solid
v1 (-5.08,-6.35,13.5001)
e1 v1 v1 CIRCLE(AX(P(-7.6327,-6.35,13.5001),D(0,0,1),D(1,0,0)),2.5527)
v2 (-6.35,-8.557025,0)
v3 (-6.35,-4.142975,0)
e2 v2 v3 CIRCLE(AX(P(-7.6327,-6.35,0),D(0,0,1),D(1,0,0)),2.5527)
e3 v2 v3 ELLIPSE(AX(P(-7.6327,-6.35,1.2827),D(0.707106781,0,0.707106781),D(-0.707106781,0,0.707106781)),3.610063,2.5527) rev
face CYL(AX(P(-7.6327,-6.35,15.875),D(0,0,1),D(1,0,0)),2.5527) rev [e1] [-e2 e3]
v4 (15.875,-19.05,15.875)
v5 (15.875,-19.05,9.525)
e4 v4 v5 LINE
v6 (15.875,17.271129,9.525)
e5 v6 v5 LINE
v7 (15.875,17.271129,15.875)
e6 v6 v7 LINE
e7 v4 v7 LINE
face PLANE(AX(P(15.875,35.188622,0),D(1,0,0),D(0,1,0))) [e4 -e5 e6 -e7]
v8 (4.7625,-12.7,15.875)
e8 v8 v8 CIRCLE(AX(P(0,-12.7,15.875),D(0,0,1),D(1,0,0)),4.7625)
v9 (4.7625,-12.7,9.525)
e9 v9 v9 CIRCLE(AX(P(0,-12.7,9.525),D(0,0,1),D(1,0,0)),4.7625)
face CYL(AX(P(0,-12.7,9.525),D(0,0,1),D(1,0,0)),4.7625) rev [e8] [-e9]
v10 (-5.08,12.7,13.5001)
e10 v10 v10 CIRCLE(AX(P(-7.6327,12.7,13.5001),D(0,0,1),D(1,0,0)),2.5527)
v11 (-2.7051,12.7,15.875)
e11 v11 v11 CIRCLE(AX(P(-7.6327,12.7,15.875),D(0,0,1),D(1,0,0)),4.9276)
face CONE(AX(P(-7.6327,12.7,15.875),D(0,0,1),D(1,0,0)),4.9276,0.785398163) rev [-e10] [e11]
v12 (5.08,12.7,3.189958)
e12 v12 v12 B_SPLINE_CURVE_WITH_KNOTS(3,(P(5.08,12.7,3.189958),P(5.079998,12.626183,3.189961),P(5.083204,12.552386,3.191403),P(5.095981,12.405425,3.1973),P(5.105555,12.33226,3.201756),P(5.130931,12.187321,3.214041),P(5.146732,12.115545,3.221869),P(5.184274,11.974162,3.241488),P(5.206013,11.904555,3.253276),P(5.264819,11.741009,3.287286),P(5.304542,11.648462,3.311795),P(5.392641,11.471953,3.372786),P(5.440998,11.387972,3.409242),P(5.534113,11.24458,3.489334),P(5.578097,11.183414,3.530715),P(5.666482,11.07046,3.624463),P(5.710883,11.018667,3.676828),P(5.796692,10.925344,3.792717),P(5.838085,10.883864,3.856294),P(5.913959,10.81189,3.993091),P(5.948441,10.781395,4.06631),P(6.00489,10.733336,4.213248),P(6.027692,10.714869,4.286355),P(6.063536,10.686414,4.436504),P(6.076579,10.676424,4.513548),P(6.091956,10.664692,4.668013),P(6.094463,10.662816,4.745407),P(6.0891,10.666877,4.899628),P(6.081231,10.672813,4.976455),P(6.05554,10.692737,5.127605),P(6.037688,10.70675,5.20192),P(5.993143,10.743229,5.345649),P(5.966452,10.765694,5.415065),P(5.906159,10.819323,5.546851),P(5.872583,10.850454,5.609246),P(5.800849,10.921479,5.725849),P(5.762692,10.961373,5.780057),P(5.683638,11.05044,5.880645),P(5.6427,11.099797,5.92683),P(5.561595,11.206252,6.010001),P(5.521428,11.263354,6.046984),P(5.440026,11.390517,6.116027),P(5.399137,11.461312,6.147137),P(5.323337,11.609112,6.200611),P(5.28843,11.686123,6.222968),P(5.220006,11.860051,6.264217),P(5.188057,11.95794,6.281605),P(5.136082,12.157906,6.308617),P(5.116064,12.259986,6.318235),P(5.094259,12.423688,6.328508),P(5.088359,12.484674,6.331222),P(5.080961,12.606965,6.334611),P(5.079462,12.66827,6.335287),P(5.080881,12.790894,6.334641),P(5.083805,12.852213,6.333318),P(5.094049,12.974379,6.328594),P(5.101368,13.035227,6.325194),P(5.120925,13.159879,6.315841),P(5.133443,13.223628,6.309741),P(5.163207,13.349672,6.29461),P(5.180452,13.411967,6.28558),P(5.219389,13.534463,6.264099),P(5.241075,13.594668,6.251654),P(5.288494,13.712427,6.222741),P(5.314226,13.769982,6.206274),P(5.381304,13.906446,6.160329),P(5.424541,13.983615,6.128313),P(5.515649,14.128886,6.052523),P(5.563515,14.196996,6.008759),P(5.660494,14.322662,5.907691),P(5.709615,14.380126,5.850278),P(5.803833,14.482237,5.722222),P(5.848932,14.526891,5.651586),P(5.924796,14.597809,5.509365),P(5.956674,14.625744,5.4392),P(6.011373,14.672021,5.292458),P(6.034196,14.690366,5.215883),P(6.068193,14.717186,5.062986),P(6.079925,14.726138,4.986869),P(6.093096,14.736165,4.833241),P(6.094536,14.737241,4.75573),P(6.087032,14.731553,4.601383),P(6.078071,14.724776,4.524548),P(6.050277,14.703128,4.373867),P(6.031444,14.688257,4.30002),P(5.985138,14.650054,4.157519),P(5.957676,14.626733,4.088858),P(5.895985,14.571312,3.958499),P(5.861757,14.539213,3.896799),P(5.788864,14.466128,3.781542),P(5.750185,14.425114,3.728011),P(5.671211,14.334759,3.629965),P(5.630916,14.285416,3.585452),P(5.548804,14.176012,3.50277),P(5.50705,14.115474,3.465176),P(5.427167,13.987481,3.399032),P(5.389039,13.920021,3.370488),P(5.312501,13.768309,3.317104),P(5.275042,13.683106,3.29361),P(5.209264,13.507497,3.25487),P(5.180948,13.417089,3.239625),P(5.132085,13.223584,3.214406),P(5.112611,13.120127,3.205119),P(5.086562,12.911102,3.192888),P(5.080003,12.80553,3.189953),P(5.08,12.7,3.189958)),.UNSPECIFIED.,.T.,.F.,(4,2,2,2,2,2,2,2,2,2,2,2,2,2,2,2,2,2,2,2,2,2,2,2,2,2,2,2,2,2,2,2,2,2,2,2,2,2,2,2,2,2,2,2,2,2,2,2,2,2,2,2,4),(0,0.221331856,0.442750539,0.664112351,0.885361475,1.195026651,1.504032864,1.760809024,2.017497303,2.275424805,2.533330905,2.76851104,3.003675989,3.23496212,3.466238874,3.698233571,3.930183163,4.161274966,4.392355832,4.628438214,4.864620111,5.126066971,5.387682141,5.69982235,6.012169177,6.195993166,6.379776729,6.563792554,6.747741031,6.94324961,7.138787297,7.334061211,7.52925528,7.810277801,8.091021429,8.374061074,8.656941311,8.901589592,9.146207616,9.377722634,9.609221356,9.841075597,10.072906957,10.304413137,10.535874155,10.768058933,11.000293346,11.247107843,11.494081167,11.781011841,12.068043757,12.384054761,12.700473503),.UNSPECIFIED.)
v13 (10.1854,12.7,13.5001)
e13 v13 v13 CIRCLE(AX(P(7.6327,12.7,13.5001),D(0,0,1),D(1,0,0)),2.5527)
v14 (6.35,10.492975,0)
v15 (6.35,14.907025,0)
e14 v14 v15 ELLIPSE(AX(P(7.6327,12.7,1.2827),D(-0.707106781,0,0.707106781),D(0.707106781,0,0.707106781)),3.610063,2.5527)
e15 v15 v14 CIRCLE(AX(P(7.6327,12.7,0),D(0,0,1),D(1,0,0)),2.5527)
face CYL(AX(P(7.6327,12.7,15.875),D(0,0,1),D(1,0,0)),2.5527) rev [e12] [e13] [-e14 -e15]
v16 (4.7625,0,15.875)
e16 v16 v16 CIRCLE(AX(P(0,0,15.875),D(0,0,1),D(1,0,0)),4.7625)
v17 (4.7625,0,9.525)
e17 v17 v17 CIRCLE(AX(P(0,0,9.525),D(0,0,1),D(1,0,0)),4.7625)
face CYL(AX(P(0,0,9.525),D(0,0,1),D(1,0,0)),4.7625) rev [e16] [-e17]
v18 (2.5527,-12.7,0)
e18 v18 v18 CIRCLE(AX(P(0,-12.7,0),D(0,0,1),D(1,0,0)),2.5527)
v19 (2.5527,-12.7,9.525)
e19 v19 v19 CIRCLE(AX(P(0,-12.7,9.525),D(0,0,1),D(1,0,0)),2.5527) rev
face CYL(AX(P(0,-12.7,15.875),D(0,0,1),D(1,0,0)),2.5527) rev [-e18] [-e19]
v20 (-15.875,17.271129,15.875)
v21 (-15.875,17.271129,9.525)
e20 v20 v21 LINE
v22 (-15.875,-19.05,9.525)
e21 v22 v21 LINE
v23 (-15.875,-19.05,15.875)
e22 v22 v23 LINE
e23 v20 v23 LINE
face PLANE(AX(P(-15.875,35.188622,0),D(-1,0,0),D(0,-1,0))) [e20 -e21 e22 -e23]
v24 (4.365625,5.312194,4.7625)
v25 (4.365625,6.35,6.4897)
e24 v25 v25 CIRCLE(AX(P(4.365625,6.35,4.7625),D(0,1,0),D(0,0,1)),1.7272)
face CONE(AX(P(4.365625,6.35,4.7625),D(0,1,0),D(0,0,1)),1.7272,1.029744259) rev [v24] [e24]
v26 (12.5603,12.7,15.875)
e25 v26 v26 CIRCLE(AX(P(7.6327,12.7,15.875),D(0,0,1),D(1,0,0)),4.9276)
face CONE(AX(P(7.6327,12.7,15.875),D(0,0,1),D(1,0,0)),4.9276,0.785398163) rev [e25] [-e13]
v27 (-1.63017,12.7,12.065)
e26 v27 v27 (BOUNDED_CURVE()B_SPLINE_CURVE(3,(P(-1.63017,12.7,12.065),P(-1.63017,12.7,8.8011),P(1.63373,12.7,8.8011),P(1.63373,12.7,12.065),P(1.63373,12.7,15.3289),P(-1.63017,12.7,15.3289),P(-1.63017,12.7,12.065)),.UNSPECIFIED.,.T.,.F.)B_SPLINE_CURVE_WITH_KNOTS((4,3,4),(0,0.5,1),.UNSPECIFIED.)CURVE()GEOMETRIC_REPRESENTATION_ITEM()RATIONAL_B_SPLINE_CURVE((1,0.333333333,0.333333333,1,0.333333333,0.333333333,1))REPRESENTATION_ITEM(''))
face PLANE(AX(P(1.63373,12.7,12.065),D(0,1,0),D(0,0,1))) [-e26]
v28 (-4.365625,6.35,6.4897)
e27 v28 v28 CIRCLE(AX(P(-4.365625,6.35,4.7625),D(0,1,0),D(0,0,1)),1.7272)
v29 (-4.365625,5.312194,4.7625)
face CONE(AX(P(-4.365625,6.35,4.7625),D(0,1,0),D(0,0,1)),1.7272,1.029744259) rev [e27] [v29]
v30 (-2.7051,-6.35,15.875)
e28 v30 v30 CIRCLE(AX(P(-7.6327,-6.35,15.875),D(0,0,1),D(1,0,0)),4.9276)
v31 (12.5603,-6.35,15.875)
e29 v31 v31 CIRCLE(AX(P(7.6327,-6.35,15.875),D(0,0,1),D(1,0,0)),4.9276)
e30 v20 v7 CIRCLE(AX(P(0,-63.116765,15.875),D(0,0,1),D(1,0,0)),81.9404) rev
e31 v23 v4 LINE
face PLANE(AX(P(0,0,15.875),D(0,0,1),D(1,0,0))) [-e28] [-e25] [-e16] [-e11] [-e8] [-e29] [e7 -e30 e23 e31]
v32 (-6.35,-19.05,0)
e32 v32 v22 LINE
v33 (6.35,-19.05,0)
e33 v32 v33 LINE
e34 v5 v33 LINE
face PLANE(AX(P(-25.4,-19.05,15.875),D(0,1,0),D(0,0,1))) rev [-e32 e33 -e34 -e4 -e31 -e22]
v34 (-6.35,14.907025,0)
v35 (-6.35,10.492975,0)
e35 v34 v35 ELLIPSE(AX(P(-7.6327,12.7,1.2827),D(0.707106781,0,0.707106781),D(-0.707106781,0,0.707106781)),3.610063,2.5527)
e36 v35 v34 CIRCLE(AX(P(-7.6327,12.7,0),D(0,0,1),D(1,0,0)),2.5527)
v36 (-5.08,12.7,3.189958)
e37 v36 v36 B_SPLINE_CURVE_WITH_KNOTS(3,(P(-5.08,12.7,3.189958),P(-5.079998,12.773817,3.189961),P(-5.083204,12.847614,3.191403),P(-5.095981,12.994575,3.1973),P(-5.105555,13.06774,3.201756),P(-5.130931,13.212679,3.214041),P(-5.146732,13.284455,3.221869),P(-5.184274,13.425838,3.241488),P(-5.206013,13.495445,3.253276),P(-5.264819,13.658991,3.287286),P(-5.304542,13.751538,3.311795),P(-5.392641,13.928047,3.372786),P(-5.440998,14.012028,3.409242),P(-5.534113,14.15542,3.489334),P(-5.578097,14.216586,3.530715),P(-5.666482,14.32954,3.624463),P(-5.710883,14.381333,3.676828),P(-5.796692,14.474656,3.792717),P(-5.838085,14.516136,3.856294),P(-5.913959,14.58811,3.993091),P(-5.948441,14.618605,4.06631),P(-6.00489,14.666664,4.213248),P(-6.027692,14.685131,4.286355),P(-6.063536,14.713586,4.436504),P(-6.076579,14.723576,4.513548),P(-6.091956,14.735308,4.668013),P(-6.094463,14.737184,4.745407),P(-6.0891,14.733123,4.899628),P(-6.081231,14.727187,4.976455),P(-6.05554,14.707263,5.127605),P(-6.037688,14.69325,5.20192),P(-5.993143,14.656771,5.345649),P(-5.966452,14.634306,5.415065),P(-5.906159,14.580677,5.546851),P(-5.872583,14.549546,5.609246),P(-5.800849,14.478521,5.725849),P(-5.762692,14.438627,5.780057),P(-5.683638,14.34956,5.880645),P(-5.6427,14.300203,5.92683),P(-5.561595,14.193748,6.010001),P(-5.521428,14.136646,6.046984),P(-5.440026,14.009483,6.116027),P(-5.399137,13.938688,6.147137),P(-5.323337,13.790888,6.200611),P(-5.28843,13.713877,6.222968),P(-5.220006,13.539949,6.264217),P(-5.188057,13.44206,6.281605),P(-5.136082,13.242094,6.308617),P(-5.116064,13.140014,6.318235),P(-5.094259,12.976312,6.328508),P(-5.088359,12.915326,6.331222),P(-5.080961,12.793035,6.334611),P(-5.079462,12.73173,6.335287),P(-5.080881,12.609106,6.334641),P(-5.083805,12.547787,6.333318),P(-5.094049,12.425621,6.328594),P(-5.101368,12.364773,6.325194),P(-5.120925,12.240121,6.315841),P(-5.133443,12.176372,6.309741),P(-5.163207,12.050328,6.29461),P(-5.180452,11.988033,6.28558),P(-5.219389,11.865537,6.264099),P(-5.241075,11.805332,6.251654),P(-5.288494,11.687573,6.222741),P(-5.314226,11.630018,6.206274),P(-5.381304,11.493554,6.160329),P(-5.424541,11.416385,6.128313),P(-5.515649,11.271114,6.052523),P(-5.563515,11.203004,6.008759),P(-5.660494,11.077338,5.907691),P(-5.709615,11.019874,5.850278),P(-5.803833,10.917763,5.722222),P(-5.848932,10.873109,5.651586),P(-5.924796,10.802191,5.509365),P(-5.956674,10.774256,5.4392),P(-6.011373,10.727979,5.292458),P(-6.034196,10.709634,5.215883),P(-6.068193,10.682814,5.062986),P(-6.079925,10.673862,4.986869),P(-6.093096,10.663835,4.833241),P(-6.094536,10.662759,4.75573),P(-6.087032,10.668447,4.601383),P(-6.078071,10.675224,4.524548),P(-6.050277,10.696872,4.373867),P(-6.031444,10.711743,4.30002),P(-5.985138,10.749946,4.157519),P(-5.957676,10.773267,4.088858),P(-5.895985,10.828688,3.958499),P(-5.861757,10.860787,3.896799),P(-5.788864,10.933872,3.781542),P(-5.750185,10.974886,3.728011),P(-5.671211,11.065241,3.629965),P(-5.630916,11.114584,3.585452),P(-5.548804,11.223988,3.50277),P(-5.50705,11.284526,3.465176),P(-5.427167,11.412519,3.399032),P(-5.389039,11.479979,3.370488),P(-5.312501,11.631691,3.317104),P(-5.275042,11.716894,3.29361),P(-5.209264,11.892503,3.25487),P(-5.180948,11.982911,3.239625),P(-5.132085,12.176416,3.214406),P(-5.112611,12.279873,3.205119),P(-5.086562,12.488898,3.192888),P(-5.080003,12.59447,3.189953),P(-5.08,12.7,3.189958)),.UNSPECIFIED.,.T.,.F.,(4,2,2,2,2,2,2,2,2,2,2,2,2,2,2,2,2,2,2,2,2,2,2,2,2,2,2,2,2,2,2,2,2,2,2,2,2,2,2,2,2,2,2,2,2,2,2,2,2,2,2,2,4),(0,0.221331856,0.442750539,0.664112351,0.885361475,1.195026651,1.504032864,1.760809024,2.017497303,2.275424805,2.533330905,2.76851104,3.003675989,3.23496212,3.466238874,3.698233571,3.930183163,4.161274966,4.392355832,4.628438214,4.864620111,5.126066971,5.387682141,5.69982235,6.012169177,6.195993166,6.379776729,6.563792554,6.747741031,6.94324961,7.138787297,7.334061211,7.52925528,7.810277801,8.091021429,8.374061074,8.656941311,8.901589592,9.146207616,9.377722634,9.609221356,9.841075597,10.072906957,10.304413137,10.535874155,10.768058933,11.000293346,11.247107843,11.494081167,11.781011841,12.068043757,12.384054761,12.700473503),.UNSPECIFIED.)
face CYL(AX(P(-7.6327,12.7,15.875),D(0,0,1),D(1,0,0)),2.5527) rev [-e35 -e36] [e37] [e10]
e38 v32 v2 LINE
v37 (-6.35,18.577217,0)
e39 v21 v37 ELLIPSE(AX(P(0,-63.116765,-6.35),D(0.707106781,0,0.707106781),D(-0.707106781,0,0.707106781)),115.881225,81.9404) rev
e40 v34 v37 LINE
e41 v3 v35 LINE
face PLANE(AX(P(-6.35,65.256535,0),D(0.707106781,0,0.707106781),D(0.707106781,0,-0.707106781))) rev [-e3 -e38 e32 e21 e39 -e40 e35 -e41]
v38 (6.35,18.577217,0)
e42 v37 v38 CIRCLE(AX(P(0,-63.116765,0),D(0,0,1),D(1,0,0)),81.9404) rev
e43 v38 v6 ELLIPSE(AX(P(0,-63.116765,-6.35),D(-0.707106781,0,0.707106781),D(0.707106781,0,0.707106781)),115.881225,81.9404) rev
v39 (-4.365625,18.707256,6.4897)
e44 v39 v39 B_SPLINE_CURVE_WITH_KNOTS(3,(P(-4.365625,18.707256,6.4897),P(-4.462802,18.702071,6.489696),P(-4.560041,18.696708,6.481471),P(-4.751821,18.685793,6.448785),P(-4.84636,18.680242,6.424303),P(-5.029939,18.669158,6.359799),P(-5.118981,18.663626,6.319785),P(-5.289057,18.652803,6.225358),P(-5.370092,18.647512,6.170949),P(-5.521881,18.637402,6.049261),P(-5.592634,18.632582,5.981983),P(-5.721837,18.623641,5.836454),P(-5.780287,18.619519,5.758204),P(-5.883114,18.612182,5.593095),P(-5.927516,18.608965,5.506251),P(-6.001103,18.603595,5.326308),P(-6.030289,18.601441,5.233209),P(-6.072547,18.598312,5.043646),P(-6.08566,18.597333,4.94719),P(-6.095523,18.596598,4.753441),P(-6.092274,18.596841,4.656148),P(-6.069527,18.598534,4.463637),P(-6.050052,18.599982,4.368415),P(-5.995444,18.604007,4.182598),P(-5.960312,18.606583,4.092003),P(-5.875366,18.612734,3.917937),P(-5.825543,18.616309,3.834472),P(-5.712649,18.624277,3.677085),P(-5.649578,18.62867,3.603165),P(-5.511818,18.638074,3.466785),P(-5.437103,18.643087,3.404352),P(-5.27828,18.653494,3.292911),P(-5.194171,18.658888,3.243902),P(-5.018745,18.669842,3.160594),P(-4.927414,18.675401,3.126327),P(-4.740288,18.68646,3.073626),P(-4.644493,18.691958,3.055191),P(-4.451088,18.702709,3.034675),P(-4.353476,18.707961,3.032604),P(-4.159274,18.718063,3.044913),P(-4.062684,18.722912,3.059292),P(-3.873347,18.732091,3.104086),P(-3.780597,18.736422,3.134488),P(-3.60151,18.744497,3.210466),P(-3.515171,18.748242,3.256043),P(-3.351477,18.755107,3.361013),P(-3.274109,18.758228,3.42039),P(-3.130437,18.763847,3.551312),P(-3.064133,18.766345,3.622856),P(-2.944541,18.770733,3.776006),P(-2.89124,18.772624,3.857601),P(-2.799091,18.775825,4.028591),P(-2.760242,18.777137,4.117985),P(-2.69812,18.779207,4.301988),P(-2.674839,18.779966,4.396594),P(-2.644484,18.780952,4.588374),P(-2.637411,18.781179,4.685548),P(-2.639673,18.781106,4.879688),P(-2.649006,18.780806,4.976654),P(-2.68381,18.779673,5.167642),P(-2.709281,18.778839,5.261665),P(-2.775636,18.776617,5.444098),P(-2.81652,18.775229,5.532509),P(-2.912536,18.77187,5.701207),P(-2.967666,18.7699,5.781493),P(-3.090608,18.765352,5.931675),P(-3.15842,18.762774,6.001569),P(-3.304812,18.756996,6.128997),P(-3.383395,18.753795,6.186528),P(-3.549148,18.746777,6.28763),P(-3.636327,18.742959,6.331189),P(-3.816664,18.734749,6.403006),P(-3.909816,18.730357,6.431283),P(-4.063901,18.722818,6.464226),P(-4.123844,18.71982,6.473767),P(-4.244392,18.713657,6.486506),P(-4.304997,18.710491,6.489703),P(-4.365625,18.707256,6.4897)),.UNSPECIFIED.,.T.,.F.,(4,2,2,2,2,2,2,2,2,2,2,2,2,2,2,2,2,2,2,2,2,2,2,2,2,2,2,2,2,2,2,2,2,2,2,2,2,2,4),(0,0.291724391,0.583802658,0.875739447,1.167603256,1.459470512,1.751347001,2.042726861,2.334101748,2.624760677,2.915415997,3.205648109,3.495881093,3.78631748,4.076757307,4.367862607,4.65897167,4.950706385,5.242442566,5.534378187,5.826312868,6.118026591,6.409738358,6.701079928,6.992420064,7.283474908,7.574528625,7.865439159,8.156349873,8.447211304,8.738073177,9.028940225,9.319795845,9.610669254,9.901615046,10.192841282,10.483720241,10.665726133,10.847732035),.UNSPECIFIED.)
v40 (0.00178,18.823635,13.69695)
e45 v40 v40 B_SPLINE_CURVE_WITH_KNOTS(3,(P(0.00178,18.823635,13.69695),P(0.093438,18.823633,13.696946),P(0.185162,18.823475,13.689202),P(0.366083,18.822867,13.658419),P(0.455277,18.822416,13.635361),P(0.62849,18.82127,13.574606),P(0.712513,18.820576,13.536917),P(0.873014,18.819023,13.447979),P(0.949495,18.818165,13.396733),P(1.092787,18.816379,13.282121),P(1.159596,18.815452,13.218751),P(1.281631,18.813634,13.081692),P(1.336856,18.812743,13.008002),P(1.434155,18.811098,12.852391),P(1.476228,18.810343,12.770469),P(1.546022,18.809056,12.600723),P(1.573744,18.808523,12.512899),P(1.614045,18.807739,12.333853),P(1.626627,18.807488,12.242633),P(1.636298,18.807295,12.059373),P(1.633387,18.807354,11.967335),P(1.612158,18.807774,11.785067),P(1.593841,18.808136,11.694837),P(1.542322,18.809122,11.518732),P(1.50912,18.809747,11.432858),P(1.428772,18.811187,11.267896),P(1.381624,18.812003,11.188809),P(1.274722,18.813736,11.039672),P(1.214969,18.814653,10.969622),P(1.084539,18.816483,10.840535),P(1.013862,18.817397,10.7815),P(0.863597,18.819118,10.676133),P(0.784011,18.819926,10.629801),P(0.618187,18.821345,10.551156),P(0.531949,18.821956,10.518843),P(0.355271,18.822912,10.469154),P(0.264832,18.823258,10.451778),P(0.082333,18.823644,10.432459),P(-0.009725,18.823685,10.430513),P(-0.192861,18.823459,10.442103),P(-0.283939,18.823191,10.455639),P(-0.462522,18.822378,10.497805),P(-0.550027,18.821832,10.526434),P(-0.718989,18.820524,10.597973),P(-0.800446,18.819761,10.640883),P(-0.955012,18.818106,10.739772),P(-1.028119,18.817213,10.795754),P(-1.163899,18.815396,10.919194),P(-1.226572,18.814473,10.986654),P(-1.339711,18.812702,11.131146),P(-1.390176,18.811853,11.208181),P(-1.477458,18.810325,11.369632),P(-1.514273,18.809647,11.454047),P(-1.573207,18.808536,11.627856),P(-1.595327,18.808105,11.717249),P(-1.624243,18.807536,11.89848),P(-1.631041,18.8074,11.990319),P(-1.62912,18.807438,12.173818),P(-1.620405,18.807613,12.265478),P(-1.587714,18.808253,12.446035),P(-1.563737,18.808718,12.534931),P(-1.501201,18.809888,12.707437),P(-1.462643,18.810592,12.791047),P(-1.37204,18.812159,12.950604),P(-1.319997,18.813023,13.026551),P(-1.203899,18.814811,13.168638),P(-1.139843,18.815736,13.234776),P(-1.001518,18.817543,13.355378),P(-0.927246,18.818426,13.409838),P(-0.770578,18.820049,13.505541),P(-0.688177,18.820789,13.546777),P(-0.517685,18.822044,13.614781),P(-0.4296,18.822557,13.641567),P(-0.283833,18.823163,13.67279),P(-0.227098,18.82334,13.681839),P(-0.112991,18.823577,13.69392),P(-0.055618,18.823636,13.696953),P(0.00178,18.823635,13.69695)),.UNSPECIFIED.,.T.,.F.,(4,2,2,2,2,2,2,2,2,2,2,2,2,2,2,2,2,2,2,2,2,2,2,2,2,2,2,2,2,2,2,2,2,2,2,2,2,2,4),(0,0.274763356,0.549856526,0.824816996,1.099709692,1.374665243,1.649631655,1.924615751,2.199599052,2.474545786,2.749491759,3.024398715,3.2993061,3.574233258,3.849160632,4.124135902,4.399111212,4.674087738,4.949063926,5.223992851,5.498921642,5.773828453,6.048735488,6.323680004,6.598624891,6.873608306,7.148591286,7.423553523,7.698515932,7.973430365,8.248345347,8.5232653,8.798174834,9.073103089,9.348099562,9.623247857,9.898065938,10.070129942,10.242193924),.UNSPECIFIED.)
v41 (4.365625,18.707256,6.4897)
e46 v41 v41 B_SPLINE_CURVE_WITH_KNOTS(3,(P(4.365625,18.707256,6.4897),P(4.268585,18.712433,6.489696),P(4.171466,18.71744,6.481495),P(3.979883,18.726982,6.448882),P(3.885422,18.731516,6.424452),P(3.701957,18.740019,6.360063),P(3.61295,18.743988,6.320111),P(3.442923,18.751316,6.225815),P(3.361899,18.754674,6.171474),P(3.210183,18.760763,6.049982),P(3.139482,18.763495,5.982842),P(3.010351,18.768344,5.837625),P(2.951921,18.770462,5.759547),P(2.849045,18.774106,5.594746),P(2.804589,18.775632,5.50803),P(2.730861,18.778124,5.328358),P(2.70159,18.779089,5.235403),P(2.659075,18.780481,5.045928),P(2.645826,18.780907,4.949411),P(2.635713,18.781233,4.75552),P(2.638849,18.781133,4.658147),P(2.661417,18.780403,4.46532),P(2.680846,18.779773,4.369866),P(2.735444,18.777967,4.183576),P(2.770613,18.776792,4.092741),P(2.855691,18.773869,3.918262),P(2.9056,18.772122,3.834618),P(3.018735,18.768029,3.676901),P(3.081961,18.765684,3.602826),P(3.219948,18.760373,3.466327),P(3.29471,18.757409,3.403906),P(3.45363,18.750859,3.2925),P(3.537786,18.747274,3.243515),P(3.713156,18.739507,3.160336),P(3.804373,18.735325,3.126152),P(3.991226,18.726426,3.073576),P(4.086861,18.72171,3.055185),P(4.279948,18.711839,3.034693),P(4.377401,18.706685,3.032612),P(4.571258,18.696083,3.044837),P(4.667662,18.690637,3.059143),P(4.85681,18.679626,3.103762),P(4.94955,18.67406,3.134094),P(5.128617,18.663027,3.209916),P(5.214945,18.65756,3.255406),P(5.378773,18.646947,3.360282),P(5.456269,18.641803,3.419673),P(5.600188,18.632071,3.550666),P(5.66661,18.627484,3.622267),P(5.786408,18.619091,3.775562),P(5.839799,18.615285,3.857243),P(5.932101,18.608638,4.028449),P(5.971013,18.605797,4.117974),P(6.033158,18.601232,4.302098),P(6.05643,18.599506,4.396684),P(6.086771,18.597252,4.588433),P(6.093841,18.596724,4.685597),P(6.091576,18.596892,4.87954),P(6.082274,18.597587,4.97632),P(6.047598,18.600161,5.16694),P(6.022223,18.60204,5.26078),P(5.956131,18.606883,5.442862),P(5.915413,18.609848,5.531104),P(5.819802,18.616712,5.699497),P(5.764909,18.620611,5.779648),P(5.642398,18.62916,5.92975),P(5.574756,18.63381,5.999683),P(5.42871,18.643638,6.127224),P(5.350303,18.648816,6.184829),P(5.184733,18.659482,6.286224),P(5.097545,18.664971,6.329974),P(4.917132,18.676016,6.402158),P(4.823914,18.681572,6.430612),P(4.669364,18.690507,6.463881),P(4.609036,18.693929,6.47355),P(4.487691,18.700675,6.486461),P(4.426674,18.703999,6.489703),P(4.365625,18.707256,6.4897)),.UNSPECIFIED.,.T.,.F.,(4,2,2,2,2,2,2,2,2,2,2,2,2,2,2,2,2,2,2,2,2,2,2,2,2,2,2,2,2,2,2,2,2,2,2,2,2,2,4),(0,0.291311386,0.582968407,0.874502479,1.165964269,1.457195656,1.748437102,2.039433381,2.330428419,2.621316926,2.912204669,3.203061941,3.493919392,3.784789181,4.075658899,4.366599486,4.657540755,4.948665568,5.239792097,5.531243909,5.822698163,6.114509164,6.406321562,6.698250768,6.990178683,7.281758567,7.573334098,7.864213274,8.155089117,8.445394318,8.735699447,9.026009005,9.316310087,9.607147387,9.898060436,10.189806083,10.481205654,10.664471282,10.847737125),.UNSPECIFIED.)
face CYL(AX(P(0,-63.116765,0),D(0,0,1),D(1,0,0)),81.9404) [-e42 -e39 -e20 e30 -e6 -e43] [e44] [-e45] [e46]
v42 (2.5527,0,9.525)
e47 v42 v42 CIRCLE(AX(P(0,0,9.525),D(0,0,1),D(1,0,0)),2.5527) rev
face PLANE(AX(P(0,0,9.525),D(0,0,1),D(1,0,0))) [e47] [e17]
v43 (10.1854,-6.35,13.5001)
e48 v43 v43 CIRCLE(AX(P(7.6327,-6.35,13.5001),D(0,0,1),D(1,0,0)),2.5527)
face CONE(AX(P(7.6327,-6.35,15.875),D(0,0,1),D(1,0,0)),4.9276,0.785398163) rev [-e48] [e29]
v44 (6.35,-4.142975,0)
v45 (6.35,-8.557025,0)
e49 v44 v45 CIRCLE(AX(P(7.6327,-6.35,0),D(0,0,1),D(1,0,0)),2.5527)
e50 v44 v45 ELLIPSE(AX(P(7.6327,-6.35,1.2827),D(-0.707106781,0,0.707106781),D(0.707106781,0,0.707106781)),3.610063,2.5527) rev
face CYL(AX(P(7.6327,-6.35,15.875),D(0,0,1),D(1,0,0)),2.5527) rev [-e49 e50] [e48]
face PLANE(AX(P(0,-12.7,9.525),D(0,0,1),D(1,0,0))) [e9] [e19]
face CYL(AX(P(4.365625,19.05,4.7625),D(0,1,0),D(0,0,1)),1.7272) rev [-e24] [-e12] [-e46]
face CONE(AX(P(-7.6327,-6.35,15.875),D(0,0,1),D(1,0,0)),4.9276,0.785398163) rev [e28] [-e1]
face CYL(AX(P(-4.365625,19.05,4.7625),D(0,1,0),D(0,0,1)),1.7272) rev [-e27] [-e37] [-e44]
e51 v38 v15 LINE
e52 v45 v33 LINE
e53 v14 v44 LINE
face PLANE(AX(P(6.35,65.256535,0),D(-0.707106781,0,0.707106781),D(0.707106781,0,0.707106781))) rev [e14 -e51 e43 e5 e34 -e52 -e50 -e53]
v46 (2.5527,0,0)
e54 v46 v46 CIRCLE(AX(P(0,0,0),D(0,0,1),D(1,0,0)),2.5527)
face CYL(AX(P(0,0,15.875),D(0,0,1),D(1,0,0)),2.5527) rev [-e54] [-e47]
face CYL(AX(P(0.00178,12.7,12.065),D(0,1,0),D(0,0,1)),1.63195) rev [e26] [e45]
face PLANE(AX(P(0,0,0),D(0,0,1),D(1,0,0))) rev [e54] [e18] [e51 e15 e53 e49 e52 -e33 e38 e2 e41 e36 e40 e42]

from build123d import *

# Parameters (mm, degrees)
SKETCH1_W                    = 50.8
SKETCH1_H                    = 38.1
BOSS_EXTRUDE1_DEPTH          = 15.875
F_1_4_20_TAPPED_HOLE1_D      = 5.1054
CUT_EXTRUDE1_DEPTH           = 36.497579143
CUT_EXTRUDE1_DEPTH_BACK      = 36.497579143
SKETCH5_W                    = 73.284203365
SKETCH5_H                    = 114.763304797
CUT_EXTRUDE3_DEPTH           = 36.497579143
CUT_EXTRUDE3_DRAFT           = 45
CUT_EXTRUDE3_PROFILE_2_DEPTH = 36.497579143
CUT_EXTRUDE3_PROFILE_2_DRAFT = 45
CUT_EXTRUDE5_DEPTH           = 34.299680929
CUT_EXTRUDE5_DEPTH_BACK      = 34.299680929
SKETCH7_W                    = 138.535058429
SKETCH7_H                    = 124.054324336
SKETCH7_W_2                  = 31.75
SKETCH7_H_2                  = 70.377244636
F_1_4_20_TAPPED_HOLE2_D      = 5.1054
F_8_32_TAPPED_HOLE1_D        = 3.4544
F_8_32_TAPPED_HOLE1_DEPTH    = 12.7
F_8_32_TAPPED_HOLE1_TIP      = 1.037806461
CUT_EXTRUDE6_DEPTH           = 6.35
SKETCH14_R                   = 4.7625
CUT_EXTRUDE7_DEPTH           = 6.35


# Read off the part's stored shape, not the designer's step: LPattern1
with BuildPart() as part:
    # Sketch1 → Boss-Extrude1 (new body)
    with BuildSketch(Plane.XY):
        Rectangle(SKETCH1_W, SKETCH1_H)
    extrude(amount=BOSS_EXTRUDE1_DEPTH)

    # 1/4-20 Tapped Hole1 (through all)
    with Locations(Plane.XY.offset(15.875)):
        with Locations((7.6327, 12.7), (-7.6327, 12.7)):
            Hole(F_1_4_20_TAPPED_HOLE1_D / 2)

    # Sketch4 → Cut-Extrude1 (cut, two sides: drawn at the far end of the back side and taken through both)
    with BuildSketch(Plane.XY.offset(15.875).offset(-CUT_EXTRUDE1_DEPTH_BACK)):
        with BuildLine():
            Line((-39.282326984, 8.793789894), (-52.704404265, 33.364356416))
            Line((-52.704404265, 33.364356416), (0, 61.927684543))
            Line((0, 61.927684543), (62.667848215, 36.771765562))
            Line((62.667848215, 36.771765562), (48.5918884, 2.86093959))
            ThreePointArc((48.5918884, 2.86093959), (5.519661368, 18.637515941), (-39.282326984, 8.793789894))
        make_face()
    extrude(amount=CUT_EXTRUDE1_DEPTH + CUT_EXTRUDE1_DEPTH_BACK, mode=Mode.SUBTRACT)


with BuildPart() as cut_extrude3_tool:
    # Sketch5 → Cut-Extrude3 (with draft: the straight prism first)
    with BuildSketch(Plane.XY):
        with Locations((-42.992101682, 7.874882724)):
            Rectangle(SKETCH5_W, SKETCH5_H)
    extrude(amount=CUT_EXTRUDE3_DEPTH)
    # Cut-Extrude3: the draft: its side faces are tilted about the plane it starts from
    cut_extrude3_sides = [cut_extrude3_tool.faces().sort_by_distance(p)[0] for p in [
        (-42.992101682, 65.256535122, 18.248789571),
        (-79.634203365, 7.874882724, 18.248789571),
        (-42.992101682, -49.506769675, 18.248789571),
        (-6.35, 7.874882724, 18.248789571),
    ]]
    draft(cut_extrude3_sides, Plane.XY, CUT_EXTRUDE3_DRAFT)


with BuildPart() as part_1:
    add(part.part)

    # Cut-Extrude3: cut by cut_extrude3_tool
    add(cut_extrude3_tool.part, mode=Mode.SUBTRACT)


with BuildPart() as cut_extrude3_profile_2_tool:
    # Sketch5 → Cut-Extrude3 profile 2 (with draft: the straight prism first)
    with BuildSketch(Plane.XY):
        with Locations((42.992101682, 7.874882724)):
            Rectangle(SKETCH5_W, SKETCH5_H)
    extrude(amount=CUT_EXTRUDE3_PROFILE_2_DEPTH)
    # Cut-Extrude3 profile 2: the draft: its side faces are tilted about the plane it starts from
    cut_extrude3_profile_2_sides = [cut_extrude3_profile_2_tool.faces().sort_by_distance(p)[0] for p in [
        (42.992101682, 65.256535122, 18.248789571),
        (6.35, 7.874882724, 18.248789571),
        (42.992101682, -49.506769675, 18.248789571),
        (79.634203365, 7.874882724, 18.248789571),
    ]]
    draft(cut_extrude3_profile_2_sides, Plane.XY, CUT_EXTRUDE3_PROFILE_2_DRAFT)


with BuildPart() as part_2:
    add(part_1.part)

    # Cut-Extrude3 profile 2: cut by cut_extrude3_profile_2_tool
    add(cut_extrude3_profile_2_tool.part, mode=Mode.SUBTRACT)

    # Cut-Extrude4 cone 1 section (through the dimple's axis) → Cut-Extrude4 (revolve, cut)
    with BuildSketch(Plane(origin=(-7.6327, 12.7, 15.875), x_dir=(0, -1, 0), z_dir=(1, 0, 0))):
        Polygon((0, 0), (4.9276, 0), (0, 4.9276), align=None)
    revolve(axis=Axis((-7.6327, 12.7, 15.875), (0, 0, -1)), mode=Mode.SUBTRACT)

    # Cut-Extrude4 cone 2 section (through the dimple's axis) → Cut-Extrude4 cone 2 (revolve, cut)
    with BuildSketch(Plane(origin=(7.6327, 12.7, 15.875), x_dir=(0, -1, 0), z_dir=(1, 0, 0))):
        Polygon((0, 0), (4.9276, 0), (0, 4.9276), align=None)
    revolve(axis=Axis((7.6327, 12.7, 15.875), (0, 0, -1)), mode=Mode.SUBTRACT)

    # Sketch7 → Cut-Extrude5 (cut, two sides: drawn at the far end of the back side and taken through both)
    with BuildSketch(Plane.XY.offset(15.875).offset(-CUT_EXTRUDE5_DEPTH_BACK)):
        with Locations((-4.796027088, -12.18557991)):
            Rectangle(SKETCH7_W, SKETCH7_H)
        Rectangle(SKETCH7_W_2, SKETCH7_H_2, mode=Mode.SUBTRACT)
    extrude(amount=CUT_EXTRUDE5_DEPTH + CUT_EXTRUDE5_DEPTH_BACK, mode=Mode.SUBTRACT)

    # 1/4-20 Tapped Hole2 (through all)
    with Locations(Plane.XY.offset(15.875)):
        with Locations((0, -12.7), (0, 0)):
            Hole(F_1_4_20_TAPPED_HOLE2_D / 2)

    # #8-32 Tapped Hole1
    with Locations(Plane(origin=(0, 19.05, 0), x_dir=(-1, 0, 0), z_dir=(0, 1, 0))):
        with Locations((4.365625, 4.7625), (-4.365625, 4.7625)):
            Hole(F_8_32_TAPPED_HOLE1_D / 2, depth=F_8_32_TAPPED_HOLE1_DEPTH)
            with Locations((0, 0, -(F_8_32_TAPPED_HOLE1_DEPTH + F_8_32_TAPPED_HOLE1_TIP / 2))):  # 118° drill point
                Cone(0, F_8_32_TAPPED_HOLE1_D / 2, F_8_32_TAPPED_HOLE1_TIP, mode=Mode.SUBTRACT)

    # Sketch13 → Cut-Extrude6 (cut)
    with BuildSketch(Plane(origin=(0, 19.05, 0), x_dir=(-1, 0, 0), z_dir=(0, -1, 0))):
        with BuildLine():
            add(Edge.make_bspline(
                [(1.630169721, -12.065), (1.630169721, -8.8011), (-1.633730278, -8.8011), (-1.633730278, -12.065), (-1.633730278, -15.3289), (1.630169721, -15.3289), (1.630169721, -12.065)],
                knots=[0, 0, 0, 0, 0.5, 0.5, 0.5, 1, 1, 1, 1], degree=3, weights=[1, 0.333333333, 0.333333333, 1, 0.333333333, 0.333333333, 1]))
        make_face()
    extrude(amount=CUT_EXTRUDE6_DEPTH, mode=Mode.SUBTRACT)

    # LPattern1 outline → LPattern1 (revolve, cut)
    with BuildSketch(Plane(origin=(-7.6327, -6.35, 0), x_dir=(1, 0, 0), z_dir=(0, -1, 0))):
        Polygon((0, 0), (2.5527, 0), (2.5527, 13.5001), (4.9276, 15.875), (0, 15.875), align=None)
    revolve(axis=Axis((-7.6327, -6.35, 0), (0, 0, 1)), mode=Mode.SUBTRACT)

    # LPattern1 2 outline → LPattern1 2 (revolve, cut)
    with BuildSketch(Plane(origin=(7.6327, -6.35, 0), x_dir=(1, 0, 0), z_dir=(0, -1, 0))):
        Polygon((0, 0), (2.5527, 0), (2.5527, 13.5001), (4.9276, 15.875), (0, 15.875), align=None)
    revolve(axis=Axis((7.6327, -6.35, 0), (0, 0, 1)), mode=Mode.SUBTRACT)

    # Sketch14 → Cut-Extrude7 (cut)
    with BuildSketch(Plane.XY.offset(15.875)):
        Circle(SKETCH14_R)
        with Locations((0, -12.7)):
            Circle(SKETCH14_R)
    extrude(amount=-CUT_EXTRUDE7_DEPTH, mode=Mode.SUBTRACT)


solid = part_2.part
